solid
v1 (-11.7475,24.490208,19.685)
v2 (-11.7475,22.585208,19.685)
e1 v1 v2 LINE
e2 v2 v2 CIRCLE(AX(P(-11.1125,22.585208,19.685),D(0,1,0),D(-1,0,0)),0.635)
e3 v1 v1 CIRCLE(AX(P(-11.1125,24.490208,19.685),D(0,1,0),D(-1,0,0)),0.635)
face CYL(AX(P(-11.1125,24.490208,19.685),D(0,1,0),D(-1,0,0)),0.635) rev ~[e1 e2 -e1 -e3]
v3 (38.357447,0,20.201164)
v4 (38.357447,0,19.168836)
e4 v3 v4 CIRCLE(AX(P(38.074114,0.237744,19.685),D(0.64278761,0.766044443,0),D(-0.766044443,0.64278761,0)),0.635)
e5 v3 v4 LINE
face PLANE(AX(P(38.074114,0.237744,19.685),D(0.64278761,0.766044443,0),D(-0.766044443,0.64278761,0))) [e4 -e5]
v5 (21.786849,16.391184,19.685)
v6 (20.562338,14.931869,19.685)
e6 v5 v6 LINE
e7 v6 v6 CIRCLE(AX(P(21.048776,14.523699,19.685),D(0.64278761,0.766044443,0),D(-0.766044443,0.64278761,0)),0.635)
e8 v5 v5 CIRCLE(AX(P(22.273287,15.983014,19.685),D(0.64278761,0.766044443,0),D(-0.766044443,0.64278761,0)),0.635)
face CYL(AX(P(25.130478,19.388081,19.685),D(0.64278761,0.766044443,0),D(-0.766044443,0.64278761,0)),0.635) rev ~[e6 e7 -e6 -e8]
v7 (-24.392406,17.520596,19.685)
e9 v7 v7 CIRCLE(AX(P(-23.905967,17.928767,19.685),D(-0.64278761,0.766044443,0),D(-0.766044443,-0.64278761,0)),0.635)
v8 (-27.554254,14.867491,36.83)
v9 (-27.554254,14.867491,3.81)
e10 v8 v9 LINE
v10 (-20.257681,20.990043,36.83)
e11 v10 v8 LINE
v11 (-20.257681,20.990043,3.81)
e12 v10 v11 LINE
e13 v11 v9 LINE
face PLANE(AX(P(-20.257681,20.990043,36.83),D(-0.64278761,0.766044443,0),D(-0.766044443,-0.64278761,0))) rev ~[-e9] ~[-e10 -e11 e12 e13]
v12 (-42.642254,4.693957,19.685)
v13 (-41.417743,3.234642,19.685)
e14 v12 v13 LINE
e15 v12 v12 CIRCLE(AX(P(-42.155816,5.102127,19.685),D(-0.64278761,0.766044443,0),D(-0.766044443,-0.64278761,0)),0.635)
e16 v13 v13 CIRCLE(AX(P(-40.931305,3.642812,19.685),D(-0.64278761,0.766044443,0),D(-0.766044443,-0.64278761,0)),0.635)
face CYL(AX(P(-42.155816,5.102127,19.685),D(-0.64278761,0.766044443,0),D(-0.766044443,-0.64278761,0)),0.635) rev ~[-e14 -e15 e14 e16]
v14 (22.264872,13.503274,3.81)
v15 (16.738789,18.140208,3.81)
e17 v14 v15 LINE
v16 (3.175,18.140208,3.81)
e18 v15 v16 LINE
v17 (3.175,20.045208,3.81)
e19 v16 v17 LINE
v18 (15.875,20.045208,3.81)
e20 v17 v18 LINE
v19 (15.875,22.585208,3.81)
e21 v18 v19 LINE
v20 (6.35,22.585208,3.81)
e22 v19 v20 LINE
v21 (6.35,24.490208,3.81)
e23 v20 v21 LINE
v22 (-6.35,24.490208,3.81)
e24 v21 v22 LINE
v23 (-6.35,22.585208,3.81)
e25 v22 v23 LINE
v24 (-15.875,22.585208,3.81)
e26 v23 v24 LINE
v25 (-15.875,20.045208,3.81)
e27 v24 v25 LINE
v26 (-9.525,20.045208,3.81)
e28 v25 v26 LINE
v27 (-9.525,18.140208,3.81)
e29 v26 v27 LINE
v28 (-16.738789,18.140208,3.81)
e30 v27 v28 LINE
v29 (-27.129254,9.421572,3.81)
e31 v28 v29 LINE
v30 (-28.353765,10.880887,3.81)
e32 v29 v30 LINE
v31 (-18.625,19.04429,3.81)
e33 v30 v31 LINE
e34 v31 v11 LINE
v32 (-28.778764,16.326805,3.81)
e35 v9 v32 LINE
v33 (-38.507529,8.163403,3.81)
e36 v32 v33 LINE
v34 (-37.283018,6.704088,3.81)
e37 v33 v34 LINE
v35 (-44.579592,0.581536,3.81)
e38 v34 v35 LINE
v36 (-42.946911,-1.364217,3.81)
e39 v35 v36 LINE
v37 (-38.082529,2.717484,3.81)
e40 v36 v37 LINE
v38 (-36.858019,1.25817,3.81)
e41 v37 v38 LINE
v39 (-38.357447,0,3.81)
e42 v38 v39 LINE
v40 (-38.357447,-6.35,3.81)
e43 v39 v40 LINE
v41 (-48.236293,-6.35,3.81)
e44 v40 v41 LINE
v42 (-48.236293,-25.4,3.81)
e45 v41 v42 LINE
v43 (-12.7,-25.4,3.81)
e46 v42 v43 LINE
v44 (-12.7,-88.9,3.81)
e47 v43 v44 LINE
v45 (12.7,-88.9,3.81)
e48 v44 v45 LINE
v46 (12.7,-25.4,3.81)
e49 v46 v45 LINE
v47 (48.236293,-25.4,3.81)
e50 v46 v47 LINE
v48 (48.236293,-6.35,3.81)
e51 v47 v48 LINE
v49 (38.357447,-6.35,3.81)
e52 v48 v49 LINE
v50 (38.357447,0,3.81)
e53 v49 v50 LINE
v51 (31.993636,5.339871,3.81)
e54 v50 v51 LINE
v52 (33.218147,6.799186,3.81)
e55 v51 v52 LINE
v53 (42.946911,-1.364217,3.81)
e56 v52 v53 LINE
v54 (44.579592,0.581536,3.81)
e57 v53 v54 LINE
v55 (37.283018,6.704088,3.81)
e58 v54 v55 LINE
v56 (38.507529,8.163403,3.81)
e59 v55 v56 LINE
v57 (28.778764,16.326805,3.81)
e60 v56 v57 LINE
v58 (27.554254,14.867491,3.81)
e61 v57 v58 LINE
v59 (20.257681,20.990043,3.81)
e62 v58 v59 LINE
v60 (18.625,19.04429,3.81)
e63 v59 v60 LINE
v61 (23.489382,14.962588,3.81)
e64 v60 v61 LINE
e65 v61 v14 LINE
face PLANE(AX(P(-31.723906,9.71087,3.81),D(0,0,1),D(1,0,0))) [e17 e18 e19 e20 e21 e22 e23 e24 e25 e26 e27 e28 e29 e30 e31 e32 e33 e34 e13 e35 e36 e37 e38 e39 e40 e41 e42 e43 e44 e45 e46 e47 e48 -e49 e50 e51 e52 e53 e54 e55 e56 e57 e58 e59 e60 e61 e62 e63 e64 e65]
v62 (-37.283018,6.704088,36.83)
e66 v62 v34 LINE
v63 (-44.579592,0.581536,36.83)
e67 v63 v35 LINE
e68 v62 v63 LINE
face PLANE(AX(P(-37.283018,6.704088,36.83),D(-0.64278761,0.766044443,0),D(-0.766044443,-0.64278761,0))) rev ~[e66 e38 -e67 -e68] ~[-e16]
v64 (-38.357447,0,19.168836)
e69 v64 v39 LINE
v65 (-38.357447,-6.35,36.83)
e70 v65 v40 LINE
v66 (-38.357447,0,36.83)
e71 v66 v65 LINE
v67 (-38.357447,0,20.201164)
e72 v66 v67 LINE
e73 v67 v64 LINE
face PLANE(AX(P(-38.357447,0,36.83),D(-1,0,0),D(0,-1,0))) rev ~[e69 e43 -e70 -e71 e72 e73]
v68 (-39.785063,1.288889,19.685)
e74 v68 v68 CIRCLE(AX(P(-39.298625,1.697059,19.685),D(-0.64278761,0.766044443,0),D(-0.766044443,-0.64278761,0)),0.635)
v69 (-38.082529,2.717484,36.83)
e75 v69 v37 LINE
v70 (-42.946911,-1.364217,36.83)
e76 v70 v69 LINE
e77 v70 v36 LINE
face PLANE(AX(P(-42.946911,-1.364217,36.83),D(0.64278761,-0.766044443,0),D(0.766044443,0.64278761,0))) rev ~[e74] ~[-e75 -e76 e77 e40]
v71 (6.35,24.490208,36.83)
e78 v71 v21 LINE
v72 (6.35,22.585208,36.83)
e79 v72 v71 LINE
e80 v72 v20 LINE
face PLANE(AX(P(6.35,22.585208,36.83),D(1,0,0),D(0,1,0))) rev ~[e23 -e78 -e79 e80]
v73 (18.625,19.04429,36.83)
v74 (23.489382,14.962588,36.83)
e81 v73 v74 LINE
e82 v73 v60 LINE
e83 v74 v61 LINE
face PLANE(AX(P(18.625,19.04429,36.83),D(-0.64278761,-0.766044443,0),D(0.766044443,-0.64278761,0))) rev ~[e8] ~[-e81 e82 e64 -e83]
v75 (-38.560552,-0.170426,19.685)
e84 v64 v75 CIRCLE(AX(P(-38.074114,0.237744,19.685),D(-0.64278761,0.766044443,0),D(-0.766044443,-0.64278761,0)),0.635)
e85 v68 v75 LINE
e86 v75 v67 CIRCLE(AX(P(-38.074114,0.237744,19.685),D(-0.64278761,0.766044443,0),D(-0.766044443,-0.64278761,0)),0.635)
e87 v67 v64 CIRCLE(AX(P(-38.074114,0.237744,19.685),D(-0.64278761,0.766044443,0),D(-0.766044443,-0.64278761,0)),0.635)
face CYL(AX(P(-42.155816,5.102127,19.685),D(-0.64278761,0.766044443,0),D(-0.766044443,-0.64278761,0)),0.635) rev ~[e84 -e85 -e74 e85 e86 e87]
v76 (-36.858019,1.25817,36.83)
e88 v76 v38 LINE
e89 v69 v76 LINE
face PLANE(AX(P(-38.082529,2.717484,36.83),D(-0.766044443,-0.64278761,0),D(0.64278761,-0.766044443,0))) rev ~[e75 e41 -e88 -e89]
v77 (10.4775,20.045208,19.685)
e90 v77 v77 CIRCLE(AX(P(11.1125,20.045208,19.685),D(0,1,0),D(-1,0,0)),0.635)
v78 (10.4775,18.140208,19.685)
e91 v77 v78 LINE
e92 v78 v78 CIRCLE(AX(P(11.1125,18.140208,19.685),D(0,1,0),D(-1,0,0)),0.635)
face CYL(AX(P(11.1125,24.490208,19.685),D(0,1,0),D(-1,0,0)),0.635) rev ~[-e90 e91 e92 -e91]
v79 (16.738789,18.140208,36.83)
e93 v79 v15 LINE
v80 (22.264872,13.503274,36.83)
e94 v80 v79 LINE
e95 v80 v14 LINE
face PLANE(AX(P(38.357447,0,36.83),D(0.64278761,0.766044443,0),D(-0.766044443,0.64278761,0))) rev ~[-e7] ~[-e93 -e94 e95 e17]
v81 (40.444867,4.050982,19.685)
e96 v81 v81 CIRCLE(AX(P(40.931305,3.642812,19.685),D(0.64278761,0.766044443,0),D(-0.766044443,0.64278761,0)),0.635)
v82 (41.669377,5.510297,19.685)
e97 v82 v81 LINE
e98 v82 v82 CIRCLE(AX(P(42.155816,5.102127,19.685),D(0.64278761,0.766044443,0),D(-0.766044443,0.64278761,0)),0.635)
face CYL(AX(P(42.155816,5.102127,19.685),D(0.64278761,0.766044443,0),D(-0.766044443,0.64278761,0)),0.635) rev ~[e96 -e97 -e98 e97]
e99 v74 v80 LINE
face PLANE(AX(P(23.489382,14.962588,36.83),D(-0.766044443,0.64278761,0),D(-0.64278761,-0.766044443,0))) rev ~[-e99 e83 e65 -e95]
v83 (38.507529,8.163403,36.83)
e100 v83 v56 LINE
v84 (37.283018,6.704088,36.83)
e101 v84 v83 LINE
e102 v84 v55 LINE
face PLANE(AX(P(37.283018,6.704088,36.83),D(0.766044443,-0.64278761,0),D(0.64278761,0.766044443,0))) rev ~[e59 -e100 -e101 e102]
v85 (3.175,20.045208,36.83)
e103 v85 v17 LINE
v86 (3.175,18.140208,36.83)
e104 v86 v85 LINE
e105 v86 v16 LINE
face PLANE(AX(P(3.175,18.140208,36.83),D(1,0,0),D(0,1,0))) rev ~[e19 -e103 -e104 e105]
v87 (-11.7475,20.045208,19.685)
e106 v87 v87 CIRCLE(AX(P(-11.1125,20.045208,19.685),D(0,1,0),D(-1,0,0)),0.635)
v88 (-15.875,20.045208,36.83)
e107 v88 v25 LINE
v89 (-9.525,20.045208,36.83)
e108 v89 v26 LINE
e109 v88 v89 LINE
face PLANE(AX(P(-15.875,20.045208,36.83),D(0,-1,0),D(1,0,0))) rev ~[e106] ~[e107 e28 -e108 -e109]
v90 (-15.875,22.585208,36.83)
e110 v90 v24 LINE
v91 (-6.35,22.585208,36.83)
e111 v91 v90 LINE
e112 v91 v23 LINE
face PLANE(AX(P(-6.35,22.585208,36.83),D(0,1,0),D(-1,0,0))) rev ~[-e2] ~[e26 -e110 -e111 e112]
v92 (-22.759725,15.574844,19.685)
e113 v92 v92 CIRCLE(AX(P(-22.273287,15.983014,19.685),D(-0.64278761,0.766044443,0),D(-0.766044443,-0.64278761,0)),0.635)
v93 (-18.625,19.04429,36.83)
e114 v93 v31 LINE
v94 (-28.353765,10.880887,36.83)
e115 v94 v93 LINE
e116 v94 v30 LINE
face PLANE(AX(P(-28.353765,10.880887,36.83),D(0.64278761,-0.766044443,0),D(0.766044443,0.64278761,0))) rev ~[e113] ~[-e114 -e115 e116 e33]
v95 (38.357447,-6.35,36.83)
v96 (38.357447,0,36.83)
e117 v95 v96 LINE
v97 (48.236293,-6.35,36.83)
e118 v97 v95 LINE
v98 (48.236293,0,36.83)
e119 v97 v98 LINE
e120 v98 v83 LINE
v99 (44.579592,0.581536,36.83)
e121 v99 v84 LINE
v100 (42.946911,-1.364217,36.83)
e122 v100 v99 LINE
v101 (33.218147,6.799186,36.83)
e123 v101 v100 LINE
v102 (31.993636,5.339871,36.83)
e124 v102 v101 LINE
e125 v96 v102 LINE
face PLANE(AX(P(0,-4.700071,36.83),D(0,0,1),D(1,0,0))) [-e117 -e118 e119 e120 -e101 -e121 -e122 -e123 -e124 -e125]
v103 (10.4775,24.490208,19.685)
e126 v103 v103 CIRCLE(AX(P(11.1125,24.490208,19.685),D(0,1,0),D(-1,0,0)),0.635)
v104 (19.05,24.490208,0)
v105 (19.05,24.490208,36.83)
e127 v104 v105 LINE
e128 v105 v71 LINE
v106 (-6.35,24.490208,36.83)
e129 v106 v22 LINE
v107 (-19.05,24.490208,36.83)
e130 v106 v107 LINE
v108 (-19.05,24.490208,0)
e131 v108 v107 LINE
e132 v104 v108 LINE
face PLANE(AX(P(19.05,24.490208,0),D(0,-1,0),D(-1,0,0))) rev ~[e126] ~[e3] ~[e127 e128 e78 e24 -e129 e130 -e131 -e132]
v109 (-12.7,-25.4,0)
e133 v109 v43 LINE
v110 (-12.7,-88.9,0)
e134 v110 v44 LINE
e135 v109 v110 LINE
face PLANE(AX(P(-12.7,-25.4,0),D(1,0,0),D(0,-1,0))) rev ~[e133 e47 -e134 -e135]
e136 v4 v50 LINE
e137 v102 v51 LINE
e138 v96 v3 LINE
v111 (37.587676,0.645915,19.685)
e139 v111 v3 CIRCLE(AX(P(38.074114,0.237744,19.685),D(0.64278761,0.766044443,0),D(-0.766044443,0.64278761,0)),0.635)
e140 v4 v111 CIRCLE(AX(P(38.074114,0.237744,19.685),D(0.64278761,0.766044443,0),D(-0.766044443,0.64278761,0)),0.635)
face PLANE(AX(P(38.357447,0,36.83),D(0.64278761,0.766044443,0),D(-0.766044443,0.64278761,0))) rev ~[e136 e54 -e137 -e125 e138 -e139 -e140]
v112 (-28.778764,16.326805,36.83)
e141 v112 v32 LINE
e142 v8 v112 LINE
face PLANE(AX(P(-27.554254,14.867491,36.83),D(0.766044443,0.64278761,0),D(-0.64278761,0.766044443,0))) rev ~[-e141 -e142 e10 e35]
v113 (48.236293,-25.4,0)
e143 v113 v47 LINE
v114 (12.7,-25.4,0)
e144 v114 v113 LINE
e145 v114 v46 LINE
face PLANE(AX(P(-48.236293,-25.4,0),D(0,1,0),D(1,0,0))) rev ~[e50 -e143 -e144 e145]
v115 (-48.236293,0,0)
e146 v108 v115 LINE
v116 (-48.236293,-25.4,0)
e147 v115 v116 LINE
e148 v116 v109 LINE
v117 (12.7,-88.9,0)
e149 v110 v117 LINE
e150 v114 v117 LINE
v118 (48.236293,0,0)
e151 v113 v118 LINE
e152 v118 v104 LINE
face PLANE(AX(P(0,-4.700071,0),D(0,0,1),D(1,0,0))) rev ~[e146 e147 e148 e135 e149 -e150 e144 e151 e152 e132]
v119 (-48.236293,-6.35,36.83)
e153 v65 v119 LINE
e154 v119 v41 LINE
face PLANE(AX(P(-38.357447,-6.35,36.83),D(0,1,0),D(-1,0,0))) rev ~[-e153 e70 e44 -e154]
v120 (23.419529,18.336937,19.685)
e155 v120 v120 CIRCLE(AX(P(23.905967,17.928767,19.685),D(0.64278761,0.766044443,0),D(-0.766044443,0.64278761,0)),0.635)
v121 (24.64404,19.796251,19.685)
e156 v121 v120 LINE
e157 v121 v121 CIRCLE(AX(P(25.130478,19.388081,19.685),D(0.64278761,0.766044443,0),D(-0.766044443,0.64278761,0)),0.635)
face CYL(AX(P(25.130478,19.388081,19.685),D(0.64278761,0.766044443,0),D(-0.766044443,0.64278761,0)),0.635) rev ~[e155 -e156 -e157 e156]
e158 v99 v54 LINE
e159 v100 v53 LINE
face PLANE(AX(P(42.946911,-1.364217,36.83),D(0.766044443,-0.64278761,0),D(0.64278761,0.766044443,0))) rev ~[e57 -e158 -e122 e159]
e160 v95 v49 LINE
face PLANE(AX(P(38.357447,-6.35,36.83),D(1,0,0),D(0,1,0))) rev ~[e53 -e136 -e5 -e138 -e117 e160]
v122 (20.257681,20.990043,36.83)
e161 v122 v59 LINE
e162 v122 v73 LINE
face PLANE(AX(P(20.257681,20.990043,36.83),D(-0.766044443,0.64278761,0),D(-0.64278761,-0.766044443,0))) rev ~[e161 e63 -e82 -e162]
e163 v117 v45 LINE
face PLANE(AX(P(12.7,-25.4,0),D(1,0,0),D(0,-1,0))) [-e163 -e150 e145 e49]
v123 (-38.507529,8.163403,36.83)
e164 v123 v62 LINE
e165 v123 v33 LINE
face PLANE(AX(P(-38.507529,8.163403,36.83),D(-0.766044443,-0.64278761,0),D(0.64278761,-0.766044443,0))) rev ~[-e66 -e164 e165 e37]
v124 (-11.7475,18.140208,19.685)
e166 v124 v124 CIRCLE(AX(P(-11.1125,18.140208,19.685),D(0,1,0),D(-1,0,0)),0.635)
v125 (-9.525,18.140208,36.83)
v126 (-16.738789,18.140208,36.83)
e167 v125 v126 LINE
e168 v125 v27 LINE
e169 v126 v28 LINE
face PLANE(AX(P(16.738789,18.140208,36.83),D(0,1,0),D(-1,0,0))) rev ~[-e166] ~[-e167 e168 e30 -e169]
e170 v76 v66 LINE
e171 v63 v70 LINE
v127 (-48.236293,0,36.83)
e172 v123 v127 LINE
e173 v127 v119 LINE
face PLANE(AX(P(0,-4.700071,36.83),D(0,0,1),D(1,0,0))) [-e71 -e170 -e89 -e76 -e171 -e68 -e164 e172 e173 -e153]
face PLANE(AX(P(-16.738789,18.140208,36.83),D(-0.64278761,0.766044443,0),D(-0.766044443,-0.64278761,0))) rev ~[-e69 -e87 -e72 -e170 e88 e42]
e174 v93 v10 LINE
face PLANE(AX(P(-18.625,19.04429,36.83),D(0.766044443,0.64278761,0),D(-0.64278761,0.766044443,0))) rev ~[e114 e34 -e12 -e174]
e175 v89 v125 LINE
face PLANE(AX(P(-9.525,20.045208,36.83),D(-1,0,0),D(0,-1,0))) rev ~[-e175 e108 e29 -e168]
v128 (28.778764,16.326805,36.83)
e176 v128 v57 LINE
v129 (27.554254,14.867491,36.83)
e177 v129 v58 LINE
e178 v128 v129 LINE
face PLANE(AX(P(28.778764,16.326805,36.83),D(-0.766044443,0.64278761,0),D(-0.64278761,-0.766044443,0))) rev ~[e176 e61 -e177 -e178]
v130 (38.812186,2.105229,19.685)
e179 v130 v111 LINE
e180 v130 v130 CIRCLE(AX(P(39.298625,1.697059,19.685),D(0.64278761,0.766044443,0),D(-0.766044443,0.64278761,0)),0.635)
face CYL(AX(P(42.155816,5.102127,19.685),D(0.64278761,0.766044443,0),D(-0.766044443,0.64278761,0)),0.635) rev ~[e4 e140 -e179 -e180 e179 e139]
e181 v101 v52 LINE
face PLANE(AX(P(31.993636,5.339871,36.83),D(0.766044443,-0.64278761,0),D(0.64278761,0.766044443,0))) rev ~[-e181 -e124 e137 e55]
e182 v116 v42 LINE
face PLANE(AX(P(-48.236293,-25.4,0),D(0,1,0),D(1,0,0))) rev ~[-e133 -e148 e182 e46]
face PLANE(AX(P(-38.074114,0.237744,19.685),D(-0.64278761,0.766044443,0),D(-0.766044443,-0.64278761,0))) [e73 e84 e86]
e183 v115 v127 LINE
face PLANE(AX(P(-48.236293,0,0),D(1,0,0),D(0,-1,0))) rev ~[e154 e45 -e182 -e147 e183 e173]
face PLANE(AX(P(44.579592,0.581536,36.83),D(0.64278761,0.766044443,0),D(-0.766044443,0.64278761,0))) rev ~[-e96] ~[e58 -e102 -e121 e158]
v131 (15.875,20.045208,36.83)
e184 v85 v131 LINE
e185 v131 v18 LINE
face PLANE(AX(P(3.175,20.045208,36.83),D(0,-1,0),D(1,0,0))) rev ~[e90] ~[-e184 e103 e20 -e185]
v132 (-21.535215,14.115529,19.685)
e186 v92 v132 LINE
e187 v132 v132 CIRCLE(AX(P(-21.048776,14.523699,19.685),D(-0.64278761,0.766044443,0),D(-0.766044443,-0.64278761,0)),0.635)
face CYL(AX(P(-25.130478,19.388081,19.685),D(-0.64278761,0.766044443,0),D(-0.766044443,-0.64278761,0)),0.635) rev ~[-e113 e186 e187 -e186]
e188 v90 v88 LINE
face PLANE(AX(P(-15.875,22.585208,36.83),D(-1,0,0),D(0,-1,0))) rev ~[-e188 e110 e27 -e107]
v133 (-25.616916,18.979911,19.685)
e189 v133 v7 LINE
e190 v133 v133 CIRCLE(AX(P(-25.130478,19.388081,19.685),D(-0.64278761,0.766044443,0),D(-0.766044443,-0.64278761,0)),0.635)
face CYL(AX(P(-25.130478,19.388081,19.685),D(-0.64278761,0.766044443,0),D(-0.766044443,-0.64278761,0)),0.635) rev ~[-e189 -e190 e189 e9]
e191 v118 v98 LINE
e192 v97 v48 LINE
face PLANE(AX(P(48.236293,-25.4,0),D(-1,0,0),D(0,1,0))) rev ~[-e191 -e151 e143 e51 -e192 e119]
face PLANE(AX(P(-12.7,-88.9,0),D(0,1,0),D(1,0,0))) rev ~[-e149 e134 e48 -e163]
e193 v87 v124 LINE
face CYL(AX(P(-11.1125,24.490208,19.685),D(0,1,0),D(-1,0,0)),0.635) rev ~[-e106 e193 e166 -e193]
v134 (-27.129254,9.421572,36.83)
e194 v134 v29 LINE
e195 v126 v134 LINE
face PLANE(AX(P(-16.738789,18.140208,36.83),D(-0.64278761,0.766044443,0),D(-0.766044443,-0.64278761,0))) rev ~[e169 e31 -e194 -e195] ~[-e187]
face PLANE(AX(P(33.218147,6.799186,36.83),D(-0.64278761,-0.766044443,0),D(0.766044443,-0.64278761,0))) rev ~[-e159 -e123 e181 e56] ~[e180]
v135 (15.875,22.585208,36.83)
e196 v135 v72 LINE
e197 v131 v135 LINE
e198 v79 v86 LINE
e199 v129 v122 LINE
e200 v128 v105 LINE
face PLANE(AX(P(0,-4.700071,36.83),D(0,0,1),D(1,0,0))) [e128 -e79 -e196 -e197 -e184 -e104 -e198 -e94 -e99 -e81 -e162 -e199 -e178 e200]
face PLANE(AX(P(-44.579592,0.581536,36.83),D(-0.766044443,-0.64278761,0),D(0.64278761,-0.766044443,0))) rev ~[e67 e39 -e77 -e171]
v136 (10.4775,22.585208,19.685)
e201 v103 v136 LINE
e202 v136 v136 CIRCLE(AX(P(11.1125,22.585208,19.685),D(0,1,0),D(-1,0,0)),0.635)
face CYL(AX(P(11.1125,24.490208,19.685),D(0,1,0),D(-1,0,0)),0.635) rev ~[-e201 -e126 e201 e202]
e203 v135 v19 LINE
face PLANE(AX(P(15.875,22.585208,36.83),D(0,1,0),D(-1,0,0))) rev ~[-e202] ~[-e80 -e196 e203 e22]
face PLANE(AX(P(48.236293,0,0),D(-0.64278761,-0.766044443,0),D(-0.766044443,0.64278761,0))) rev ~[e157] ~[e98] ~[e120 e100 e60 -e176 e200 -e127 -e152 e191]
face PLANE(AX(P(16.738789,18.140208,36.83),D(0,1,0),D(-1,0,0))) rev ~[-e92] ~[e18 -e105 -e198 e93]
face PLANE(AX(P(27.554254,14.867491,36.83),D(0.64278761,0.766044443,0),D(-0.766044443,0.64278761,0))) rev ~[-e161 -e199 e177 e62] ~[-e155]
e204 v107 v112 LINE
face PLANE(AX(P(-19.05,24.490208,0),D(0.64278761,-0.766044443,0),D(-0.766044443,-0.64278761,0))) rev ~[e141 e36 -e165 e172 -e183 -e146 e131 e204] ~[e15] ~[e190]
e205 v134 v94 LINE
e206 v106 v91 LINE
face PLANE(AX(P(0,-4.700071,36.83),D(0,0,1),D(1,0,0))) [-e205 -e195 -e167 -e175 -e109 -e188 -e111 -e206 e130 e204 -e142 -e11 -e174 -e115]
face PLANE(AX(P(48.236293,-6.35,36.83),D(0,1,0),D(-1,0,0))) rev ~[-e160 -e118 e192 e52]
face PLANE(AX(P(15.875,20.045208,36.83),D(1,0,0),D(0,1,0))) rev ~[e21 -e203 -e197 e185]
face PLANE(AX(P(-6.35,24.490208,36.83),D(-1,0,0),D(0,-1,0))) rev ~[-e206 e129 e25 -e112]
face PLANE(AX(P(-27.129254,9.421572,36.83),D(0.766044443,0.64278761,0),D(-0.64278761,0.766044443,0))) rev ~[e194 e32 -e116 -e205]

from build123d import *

# Parameters (mm, degrees)
F1_DEPTH  = 36.83
F3_DEPTH  = 33.02
F5_DEPTH  = 33.02
F6_R      = 0.635
F7_DEPTH  = 6.35
F9_R      = 0.635
F10_DEPTH = 6.35
F8_R      = 0.635
F11_DEPTH = 6.35
F12_W     = 25.4
F12_H     = 63.5
F13_DEPTH = 3.81


with BuildPart() as f1:
    # F0 (on Top) → F1 (new body)
    with BuildSketch(Plane.XY):
        Polygon((-19.05, 24.4902079291), (-48.2362932828, 0), (-48.2362932828, -25.4), (48.2362932828, -25.4), (48.2362932828, 0), (19.05, 24.4902079291), align=None)
    extrude(amount=F1_DEPTH)

    # F2 (on face) → F3 (cut)
    with BuildSketch(Plane.XY.offset(36.83)):
        Polygon((-16.7387890124, 18.1402079291), (-38.3574469823, 0), (-38.3574469823, -6.35), (-48.2362932828, -6.35), (-48.2362932828, -25.4), (-38.3574469823, -25.4), (38.3574469823, -25.4), (48.2362932828, -25.4), (48.2362932828, -6.35), (38.3574469823, -6.35), (38.3574469823, 0), (16.7387890124, 18.1402079291), align=None)
    extrude(amount=-F3_DEPTH, mode=Mode.SUBTRACT)

    # F4 (on face) → F5 (cut)
    with BuildSketch(Plane.XY.offset(36.83)):
        Polygon((15.875, 22.5852079291), (6.35, 22.5852079291), (6.35, 24.4902079291), (-6.35, 24.4902079291), (-6.35, 22.5852079291), (-15.875, 22.5852079291), (-15.875, 20.0452079291), (-9.525, 20.0452079291), (-9.525, 18.1402079291), (3.175, 18.1402079291), (3.175, 20.0452079291), (15.875, 20.0452079291), align=None)
        Polygon((22.2648719992, 13.503273733), (31.9936364268, 5.33987109), (33.2181468233, 6.7991857541), (42.9469112509, -1.3642168889), (44.5795917795, 0.5815359966), (37.2830184588, 6.7040879789), (38.5075288552, 8.163402643), (28.7787644276, 16.326805286), (27.5542540312, 14.8674906219), (20.2576807104, 20.9900426042), (18.6250001818, 19.0442897186), (23.4893823957, 14.9625883971), align=None)
        Polygon((-42.9469112509, -1.3642168889), (-38.0825290371, 2.7174844326), (-36.8580186406, 1.2581697685), (-27.129254213, 9.4215724115), (-28.3537646095, 10.8808870756), (-18.6250001818, 19.0442897186), (-20.2576807104, 20.9900426042), (-27.5542540312, 14.8674906219), (-28.7787644276, 16.326805286), (-38.5075288552, 8.163402643), (-37.2830184588, 6.7040879789), (-44.5795917795, 0.5815359966), align=None)
    extrude(amount=-F5_DEPTH, mode=Mode.SUBTRACT)

    # F6 (on face) → F7 (cut, through all)
    with BuildSketch(Plane(origin=(-19.9300744284, 23.7517378008, 0), x_dir=(-0.7660444431, -0.6427876097, 0), z_dir=(-0.6427876097, 0.7660444431, 0))):
        with Locations((6.788644426, 19.685)):
            Circle(F6_R)
        with Locations((29.013644426, 19.685)):
            Circle(F6_R)
    extrude(amount=-F7_DEPTH, mode=Mode.SUBTRACT)

    # F9 (on face) → F10 (cut, through all)
    with BuildSketch(Plane(origin=(19.9300744284, 23.7517378008, 0), x_dir=(-0.7660444431, 0.6427876097, 0), z_dir=(0.6427876097, 0.7660444431, 0))):
        with Locations((-29.013644426, 19.685)):
            Circle(F9_R)
        with Locations((-6.788644426, 19.685)):
            Circle(F9_R)
    extrude(amount=-F10_DEPTH, mode=Mode.SUBTRACT)

    # F8 (on face) → F11 (cut, through all)
    with BuildSketch(Plane(origin=(0, 24.4902079291, 0), x_dir=(-1, 0, 0), z_dir=(0, 1, 0))):
        with Locations((-11.1125, 19.685)):
            Circle(F8_R)
        with Locations((11.1125, 19.685)):
            Circle(F8_R)
    extrude(amount=-F11_DEPTH, mode=Mode.SUBTRACT)

    # F12 (on face) → F13 (join, through all)
    with BuildSketch(Plane(origin=(0, 0, 0), x_dir=(1, 0, 0), z_dir=(0, 0, -1))):
        with Locations((0, 57.15)):
            Rectangle(F12_W, F12_H)
    extrude(amount=-F13_DEPTH)


solid = f1.part
